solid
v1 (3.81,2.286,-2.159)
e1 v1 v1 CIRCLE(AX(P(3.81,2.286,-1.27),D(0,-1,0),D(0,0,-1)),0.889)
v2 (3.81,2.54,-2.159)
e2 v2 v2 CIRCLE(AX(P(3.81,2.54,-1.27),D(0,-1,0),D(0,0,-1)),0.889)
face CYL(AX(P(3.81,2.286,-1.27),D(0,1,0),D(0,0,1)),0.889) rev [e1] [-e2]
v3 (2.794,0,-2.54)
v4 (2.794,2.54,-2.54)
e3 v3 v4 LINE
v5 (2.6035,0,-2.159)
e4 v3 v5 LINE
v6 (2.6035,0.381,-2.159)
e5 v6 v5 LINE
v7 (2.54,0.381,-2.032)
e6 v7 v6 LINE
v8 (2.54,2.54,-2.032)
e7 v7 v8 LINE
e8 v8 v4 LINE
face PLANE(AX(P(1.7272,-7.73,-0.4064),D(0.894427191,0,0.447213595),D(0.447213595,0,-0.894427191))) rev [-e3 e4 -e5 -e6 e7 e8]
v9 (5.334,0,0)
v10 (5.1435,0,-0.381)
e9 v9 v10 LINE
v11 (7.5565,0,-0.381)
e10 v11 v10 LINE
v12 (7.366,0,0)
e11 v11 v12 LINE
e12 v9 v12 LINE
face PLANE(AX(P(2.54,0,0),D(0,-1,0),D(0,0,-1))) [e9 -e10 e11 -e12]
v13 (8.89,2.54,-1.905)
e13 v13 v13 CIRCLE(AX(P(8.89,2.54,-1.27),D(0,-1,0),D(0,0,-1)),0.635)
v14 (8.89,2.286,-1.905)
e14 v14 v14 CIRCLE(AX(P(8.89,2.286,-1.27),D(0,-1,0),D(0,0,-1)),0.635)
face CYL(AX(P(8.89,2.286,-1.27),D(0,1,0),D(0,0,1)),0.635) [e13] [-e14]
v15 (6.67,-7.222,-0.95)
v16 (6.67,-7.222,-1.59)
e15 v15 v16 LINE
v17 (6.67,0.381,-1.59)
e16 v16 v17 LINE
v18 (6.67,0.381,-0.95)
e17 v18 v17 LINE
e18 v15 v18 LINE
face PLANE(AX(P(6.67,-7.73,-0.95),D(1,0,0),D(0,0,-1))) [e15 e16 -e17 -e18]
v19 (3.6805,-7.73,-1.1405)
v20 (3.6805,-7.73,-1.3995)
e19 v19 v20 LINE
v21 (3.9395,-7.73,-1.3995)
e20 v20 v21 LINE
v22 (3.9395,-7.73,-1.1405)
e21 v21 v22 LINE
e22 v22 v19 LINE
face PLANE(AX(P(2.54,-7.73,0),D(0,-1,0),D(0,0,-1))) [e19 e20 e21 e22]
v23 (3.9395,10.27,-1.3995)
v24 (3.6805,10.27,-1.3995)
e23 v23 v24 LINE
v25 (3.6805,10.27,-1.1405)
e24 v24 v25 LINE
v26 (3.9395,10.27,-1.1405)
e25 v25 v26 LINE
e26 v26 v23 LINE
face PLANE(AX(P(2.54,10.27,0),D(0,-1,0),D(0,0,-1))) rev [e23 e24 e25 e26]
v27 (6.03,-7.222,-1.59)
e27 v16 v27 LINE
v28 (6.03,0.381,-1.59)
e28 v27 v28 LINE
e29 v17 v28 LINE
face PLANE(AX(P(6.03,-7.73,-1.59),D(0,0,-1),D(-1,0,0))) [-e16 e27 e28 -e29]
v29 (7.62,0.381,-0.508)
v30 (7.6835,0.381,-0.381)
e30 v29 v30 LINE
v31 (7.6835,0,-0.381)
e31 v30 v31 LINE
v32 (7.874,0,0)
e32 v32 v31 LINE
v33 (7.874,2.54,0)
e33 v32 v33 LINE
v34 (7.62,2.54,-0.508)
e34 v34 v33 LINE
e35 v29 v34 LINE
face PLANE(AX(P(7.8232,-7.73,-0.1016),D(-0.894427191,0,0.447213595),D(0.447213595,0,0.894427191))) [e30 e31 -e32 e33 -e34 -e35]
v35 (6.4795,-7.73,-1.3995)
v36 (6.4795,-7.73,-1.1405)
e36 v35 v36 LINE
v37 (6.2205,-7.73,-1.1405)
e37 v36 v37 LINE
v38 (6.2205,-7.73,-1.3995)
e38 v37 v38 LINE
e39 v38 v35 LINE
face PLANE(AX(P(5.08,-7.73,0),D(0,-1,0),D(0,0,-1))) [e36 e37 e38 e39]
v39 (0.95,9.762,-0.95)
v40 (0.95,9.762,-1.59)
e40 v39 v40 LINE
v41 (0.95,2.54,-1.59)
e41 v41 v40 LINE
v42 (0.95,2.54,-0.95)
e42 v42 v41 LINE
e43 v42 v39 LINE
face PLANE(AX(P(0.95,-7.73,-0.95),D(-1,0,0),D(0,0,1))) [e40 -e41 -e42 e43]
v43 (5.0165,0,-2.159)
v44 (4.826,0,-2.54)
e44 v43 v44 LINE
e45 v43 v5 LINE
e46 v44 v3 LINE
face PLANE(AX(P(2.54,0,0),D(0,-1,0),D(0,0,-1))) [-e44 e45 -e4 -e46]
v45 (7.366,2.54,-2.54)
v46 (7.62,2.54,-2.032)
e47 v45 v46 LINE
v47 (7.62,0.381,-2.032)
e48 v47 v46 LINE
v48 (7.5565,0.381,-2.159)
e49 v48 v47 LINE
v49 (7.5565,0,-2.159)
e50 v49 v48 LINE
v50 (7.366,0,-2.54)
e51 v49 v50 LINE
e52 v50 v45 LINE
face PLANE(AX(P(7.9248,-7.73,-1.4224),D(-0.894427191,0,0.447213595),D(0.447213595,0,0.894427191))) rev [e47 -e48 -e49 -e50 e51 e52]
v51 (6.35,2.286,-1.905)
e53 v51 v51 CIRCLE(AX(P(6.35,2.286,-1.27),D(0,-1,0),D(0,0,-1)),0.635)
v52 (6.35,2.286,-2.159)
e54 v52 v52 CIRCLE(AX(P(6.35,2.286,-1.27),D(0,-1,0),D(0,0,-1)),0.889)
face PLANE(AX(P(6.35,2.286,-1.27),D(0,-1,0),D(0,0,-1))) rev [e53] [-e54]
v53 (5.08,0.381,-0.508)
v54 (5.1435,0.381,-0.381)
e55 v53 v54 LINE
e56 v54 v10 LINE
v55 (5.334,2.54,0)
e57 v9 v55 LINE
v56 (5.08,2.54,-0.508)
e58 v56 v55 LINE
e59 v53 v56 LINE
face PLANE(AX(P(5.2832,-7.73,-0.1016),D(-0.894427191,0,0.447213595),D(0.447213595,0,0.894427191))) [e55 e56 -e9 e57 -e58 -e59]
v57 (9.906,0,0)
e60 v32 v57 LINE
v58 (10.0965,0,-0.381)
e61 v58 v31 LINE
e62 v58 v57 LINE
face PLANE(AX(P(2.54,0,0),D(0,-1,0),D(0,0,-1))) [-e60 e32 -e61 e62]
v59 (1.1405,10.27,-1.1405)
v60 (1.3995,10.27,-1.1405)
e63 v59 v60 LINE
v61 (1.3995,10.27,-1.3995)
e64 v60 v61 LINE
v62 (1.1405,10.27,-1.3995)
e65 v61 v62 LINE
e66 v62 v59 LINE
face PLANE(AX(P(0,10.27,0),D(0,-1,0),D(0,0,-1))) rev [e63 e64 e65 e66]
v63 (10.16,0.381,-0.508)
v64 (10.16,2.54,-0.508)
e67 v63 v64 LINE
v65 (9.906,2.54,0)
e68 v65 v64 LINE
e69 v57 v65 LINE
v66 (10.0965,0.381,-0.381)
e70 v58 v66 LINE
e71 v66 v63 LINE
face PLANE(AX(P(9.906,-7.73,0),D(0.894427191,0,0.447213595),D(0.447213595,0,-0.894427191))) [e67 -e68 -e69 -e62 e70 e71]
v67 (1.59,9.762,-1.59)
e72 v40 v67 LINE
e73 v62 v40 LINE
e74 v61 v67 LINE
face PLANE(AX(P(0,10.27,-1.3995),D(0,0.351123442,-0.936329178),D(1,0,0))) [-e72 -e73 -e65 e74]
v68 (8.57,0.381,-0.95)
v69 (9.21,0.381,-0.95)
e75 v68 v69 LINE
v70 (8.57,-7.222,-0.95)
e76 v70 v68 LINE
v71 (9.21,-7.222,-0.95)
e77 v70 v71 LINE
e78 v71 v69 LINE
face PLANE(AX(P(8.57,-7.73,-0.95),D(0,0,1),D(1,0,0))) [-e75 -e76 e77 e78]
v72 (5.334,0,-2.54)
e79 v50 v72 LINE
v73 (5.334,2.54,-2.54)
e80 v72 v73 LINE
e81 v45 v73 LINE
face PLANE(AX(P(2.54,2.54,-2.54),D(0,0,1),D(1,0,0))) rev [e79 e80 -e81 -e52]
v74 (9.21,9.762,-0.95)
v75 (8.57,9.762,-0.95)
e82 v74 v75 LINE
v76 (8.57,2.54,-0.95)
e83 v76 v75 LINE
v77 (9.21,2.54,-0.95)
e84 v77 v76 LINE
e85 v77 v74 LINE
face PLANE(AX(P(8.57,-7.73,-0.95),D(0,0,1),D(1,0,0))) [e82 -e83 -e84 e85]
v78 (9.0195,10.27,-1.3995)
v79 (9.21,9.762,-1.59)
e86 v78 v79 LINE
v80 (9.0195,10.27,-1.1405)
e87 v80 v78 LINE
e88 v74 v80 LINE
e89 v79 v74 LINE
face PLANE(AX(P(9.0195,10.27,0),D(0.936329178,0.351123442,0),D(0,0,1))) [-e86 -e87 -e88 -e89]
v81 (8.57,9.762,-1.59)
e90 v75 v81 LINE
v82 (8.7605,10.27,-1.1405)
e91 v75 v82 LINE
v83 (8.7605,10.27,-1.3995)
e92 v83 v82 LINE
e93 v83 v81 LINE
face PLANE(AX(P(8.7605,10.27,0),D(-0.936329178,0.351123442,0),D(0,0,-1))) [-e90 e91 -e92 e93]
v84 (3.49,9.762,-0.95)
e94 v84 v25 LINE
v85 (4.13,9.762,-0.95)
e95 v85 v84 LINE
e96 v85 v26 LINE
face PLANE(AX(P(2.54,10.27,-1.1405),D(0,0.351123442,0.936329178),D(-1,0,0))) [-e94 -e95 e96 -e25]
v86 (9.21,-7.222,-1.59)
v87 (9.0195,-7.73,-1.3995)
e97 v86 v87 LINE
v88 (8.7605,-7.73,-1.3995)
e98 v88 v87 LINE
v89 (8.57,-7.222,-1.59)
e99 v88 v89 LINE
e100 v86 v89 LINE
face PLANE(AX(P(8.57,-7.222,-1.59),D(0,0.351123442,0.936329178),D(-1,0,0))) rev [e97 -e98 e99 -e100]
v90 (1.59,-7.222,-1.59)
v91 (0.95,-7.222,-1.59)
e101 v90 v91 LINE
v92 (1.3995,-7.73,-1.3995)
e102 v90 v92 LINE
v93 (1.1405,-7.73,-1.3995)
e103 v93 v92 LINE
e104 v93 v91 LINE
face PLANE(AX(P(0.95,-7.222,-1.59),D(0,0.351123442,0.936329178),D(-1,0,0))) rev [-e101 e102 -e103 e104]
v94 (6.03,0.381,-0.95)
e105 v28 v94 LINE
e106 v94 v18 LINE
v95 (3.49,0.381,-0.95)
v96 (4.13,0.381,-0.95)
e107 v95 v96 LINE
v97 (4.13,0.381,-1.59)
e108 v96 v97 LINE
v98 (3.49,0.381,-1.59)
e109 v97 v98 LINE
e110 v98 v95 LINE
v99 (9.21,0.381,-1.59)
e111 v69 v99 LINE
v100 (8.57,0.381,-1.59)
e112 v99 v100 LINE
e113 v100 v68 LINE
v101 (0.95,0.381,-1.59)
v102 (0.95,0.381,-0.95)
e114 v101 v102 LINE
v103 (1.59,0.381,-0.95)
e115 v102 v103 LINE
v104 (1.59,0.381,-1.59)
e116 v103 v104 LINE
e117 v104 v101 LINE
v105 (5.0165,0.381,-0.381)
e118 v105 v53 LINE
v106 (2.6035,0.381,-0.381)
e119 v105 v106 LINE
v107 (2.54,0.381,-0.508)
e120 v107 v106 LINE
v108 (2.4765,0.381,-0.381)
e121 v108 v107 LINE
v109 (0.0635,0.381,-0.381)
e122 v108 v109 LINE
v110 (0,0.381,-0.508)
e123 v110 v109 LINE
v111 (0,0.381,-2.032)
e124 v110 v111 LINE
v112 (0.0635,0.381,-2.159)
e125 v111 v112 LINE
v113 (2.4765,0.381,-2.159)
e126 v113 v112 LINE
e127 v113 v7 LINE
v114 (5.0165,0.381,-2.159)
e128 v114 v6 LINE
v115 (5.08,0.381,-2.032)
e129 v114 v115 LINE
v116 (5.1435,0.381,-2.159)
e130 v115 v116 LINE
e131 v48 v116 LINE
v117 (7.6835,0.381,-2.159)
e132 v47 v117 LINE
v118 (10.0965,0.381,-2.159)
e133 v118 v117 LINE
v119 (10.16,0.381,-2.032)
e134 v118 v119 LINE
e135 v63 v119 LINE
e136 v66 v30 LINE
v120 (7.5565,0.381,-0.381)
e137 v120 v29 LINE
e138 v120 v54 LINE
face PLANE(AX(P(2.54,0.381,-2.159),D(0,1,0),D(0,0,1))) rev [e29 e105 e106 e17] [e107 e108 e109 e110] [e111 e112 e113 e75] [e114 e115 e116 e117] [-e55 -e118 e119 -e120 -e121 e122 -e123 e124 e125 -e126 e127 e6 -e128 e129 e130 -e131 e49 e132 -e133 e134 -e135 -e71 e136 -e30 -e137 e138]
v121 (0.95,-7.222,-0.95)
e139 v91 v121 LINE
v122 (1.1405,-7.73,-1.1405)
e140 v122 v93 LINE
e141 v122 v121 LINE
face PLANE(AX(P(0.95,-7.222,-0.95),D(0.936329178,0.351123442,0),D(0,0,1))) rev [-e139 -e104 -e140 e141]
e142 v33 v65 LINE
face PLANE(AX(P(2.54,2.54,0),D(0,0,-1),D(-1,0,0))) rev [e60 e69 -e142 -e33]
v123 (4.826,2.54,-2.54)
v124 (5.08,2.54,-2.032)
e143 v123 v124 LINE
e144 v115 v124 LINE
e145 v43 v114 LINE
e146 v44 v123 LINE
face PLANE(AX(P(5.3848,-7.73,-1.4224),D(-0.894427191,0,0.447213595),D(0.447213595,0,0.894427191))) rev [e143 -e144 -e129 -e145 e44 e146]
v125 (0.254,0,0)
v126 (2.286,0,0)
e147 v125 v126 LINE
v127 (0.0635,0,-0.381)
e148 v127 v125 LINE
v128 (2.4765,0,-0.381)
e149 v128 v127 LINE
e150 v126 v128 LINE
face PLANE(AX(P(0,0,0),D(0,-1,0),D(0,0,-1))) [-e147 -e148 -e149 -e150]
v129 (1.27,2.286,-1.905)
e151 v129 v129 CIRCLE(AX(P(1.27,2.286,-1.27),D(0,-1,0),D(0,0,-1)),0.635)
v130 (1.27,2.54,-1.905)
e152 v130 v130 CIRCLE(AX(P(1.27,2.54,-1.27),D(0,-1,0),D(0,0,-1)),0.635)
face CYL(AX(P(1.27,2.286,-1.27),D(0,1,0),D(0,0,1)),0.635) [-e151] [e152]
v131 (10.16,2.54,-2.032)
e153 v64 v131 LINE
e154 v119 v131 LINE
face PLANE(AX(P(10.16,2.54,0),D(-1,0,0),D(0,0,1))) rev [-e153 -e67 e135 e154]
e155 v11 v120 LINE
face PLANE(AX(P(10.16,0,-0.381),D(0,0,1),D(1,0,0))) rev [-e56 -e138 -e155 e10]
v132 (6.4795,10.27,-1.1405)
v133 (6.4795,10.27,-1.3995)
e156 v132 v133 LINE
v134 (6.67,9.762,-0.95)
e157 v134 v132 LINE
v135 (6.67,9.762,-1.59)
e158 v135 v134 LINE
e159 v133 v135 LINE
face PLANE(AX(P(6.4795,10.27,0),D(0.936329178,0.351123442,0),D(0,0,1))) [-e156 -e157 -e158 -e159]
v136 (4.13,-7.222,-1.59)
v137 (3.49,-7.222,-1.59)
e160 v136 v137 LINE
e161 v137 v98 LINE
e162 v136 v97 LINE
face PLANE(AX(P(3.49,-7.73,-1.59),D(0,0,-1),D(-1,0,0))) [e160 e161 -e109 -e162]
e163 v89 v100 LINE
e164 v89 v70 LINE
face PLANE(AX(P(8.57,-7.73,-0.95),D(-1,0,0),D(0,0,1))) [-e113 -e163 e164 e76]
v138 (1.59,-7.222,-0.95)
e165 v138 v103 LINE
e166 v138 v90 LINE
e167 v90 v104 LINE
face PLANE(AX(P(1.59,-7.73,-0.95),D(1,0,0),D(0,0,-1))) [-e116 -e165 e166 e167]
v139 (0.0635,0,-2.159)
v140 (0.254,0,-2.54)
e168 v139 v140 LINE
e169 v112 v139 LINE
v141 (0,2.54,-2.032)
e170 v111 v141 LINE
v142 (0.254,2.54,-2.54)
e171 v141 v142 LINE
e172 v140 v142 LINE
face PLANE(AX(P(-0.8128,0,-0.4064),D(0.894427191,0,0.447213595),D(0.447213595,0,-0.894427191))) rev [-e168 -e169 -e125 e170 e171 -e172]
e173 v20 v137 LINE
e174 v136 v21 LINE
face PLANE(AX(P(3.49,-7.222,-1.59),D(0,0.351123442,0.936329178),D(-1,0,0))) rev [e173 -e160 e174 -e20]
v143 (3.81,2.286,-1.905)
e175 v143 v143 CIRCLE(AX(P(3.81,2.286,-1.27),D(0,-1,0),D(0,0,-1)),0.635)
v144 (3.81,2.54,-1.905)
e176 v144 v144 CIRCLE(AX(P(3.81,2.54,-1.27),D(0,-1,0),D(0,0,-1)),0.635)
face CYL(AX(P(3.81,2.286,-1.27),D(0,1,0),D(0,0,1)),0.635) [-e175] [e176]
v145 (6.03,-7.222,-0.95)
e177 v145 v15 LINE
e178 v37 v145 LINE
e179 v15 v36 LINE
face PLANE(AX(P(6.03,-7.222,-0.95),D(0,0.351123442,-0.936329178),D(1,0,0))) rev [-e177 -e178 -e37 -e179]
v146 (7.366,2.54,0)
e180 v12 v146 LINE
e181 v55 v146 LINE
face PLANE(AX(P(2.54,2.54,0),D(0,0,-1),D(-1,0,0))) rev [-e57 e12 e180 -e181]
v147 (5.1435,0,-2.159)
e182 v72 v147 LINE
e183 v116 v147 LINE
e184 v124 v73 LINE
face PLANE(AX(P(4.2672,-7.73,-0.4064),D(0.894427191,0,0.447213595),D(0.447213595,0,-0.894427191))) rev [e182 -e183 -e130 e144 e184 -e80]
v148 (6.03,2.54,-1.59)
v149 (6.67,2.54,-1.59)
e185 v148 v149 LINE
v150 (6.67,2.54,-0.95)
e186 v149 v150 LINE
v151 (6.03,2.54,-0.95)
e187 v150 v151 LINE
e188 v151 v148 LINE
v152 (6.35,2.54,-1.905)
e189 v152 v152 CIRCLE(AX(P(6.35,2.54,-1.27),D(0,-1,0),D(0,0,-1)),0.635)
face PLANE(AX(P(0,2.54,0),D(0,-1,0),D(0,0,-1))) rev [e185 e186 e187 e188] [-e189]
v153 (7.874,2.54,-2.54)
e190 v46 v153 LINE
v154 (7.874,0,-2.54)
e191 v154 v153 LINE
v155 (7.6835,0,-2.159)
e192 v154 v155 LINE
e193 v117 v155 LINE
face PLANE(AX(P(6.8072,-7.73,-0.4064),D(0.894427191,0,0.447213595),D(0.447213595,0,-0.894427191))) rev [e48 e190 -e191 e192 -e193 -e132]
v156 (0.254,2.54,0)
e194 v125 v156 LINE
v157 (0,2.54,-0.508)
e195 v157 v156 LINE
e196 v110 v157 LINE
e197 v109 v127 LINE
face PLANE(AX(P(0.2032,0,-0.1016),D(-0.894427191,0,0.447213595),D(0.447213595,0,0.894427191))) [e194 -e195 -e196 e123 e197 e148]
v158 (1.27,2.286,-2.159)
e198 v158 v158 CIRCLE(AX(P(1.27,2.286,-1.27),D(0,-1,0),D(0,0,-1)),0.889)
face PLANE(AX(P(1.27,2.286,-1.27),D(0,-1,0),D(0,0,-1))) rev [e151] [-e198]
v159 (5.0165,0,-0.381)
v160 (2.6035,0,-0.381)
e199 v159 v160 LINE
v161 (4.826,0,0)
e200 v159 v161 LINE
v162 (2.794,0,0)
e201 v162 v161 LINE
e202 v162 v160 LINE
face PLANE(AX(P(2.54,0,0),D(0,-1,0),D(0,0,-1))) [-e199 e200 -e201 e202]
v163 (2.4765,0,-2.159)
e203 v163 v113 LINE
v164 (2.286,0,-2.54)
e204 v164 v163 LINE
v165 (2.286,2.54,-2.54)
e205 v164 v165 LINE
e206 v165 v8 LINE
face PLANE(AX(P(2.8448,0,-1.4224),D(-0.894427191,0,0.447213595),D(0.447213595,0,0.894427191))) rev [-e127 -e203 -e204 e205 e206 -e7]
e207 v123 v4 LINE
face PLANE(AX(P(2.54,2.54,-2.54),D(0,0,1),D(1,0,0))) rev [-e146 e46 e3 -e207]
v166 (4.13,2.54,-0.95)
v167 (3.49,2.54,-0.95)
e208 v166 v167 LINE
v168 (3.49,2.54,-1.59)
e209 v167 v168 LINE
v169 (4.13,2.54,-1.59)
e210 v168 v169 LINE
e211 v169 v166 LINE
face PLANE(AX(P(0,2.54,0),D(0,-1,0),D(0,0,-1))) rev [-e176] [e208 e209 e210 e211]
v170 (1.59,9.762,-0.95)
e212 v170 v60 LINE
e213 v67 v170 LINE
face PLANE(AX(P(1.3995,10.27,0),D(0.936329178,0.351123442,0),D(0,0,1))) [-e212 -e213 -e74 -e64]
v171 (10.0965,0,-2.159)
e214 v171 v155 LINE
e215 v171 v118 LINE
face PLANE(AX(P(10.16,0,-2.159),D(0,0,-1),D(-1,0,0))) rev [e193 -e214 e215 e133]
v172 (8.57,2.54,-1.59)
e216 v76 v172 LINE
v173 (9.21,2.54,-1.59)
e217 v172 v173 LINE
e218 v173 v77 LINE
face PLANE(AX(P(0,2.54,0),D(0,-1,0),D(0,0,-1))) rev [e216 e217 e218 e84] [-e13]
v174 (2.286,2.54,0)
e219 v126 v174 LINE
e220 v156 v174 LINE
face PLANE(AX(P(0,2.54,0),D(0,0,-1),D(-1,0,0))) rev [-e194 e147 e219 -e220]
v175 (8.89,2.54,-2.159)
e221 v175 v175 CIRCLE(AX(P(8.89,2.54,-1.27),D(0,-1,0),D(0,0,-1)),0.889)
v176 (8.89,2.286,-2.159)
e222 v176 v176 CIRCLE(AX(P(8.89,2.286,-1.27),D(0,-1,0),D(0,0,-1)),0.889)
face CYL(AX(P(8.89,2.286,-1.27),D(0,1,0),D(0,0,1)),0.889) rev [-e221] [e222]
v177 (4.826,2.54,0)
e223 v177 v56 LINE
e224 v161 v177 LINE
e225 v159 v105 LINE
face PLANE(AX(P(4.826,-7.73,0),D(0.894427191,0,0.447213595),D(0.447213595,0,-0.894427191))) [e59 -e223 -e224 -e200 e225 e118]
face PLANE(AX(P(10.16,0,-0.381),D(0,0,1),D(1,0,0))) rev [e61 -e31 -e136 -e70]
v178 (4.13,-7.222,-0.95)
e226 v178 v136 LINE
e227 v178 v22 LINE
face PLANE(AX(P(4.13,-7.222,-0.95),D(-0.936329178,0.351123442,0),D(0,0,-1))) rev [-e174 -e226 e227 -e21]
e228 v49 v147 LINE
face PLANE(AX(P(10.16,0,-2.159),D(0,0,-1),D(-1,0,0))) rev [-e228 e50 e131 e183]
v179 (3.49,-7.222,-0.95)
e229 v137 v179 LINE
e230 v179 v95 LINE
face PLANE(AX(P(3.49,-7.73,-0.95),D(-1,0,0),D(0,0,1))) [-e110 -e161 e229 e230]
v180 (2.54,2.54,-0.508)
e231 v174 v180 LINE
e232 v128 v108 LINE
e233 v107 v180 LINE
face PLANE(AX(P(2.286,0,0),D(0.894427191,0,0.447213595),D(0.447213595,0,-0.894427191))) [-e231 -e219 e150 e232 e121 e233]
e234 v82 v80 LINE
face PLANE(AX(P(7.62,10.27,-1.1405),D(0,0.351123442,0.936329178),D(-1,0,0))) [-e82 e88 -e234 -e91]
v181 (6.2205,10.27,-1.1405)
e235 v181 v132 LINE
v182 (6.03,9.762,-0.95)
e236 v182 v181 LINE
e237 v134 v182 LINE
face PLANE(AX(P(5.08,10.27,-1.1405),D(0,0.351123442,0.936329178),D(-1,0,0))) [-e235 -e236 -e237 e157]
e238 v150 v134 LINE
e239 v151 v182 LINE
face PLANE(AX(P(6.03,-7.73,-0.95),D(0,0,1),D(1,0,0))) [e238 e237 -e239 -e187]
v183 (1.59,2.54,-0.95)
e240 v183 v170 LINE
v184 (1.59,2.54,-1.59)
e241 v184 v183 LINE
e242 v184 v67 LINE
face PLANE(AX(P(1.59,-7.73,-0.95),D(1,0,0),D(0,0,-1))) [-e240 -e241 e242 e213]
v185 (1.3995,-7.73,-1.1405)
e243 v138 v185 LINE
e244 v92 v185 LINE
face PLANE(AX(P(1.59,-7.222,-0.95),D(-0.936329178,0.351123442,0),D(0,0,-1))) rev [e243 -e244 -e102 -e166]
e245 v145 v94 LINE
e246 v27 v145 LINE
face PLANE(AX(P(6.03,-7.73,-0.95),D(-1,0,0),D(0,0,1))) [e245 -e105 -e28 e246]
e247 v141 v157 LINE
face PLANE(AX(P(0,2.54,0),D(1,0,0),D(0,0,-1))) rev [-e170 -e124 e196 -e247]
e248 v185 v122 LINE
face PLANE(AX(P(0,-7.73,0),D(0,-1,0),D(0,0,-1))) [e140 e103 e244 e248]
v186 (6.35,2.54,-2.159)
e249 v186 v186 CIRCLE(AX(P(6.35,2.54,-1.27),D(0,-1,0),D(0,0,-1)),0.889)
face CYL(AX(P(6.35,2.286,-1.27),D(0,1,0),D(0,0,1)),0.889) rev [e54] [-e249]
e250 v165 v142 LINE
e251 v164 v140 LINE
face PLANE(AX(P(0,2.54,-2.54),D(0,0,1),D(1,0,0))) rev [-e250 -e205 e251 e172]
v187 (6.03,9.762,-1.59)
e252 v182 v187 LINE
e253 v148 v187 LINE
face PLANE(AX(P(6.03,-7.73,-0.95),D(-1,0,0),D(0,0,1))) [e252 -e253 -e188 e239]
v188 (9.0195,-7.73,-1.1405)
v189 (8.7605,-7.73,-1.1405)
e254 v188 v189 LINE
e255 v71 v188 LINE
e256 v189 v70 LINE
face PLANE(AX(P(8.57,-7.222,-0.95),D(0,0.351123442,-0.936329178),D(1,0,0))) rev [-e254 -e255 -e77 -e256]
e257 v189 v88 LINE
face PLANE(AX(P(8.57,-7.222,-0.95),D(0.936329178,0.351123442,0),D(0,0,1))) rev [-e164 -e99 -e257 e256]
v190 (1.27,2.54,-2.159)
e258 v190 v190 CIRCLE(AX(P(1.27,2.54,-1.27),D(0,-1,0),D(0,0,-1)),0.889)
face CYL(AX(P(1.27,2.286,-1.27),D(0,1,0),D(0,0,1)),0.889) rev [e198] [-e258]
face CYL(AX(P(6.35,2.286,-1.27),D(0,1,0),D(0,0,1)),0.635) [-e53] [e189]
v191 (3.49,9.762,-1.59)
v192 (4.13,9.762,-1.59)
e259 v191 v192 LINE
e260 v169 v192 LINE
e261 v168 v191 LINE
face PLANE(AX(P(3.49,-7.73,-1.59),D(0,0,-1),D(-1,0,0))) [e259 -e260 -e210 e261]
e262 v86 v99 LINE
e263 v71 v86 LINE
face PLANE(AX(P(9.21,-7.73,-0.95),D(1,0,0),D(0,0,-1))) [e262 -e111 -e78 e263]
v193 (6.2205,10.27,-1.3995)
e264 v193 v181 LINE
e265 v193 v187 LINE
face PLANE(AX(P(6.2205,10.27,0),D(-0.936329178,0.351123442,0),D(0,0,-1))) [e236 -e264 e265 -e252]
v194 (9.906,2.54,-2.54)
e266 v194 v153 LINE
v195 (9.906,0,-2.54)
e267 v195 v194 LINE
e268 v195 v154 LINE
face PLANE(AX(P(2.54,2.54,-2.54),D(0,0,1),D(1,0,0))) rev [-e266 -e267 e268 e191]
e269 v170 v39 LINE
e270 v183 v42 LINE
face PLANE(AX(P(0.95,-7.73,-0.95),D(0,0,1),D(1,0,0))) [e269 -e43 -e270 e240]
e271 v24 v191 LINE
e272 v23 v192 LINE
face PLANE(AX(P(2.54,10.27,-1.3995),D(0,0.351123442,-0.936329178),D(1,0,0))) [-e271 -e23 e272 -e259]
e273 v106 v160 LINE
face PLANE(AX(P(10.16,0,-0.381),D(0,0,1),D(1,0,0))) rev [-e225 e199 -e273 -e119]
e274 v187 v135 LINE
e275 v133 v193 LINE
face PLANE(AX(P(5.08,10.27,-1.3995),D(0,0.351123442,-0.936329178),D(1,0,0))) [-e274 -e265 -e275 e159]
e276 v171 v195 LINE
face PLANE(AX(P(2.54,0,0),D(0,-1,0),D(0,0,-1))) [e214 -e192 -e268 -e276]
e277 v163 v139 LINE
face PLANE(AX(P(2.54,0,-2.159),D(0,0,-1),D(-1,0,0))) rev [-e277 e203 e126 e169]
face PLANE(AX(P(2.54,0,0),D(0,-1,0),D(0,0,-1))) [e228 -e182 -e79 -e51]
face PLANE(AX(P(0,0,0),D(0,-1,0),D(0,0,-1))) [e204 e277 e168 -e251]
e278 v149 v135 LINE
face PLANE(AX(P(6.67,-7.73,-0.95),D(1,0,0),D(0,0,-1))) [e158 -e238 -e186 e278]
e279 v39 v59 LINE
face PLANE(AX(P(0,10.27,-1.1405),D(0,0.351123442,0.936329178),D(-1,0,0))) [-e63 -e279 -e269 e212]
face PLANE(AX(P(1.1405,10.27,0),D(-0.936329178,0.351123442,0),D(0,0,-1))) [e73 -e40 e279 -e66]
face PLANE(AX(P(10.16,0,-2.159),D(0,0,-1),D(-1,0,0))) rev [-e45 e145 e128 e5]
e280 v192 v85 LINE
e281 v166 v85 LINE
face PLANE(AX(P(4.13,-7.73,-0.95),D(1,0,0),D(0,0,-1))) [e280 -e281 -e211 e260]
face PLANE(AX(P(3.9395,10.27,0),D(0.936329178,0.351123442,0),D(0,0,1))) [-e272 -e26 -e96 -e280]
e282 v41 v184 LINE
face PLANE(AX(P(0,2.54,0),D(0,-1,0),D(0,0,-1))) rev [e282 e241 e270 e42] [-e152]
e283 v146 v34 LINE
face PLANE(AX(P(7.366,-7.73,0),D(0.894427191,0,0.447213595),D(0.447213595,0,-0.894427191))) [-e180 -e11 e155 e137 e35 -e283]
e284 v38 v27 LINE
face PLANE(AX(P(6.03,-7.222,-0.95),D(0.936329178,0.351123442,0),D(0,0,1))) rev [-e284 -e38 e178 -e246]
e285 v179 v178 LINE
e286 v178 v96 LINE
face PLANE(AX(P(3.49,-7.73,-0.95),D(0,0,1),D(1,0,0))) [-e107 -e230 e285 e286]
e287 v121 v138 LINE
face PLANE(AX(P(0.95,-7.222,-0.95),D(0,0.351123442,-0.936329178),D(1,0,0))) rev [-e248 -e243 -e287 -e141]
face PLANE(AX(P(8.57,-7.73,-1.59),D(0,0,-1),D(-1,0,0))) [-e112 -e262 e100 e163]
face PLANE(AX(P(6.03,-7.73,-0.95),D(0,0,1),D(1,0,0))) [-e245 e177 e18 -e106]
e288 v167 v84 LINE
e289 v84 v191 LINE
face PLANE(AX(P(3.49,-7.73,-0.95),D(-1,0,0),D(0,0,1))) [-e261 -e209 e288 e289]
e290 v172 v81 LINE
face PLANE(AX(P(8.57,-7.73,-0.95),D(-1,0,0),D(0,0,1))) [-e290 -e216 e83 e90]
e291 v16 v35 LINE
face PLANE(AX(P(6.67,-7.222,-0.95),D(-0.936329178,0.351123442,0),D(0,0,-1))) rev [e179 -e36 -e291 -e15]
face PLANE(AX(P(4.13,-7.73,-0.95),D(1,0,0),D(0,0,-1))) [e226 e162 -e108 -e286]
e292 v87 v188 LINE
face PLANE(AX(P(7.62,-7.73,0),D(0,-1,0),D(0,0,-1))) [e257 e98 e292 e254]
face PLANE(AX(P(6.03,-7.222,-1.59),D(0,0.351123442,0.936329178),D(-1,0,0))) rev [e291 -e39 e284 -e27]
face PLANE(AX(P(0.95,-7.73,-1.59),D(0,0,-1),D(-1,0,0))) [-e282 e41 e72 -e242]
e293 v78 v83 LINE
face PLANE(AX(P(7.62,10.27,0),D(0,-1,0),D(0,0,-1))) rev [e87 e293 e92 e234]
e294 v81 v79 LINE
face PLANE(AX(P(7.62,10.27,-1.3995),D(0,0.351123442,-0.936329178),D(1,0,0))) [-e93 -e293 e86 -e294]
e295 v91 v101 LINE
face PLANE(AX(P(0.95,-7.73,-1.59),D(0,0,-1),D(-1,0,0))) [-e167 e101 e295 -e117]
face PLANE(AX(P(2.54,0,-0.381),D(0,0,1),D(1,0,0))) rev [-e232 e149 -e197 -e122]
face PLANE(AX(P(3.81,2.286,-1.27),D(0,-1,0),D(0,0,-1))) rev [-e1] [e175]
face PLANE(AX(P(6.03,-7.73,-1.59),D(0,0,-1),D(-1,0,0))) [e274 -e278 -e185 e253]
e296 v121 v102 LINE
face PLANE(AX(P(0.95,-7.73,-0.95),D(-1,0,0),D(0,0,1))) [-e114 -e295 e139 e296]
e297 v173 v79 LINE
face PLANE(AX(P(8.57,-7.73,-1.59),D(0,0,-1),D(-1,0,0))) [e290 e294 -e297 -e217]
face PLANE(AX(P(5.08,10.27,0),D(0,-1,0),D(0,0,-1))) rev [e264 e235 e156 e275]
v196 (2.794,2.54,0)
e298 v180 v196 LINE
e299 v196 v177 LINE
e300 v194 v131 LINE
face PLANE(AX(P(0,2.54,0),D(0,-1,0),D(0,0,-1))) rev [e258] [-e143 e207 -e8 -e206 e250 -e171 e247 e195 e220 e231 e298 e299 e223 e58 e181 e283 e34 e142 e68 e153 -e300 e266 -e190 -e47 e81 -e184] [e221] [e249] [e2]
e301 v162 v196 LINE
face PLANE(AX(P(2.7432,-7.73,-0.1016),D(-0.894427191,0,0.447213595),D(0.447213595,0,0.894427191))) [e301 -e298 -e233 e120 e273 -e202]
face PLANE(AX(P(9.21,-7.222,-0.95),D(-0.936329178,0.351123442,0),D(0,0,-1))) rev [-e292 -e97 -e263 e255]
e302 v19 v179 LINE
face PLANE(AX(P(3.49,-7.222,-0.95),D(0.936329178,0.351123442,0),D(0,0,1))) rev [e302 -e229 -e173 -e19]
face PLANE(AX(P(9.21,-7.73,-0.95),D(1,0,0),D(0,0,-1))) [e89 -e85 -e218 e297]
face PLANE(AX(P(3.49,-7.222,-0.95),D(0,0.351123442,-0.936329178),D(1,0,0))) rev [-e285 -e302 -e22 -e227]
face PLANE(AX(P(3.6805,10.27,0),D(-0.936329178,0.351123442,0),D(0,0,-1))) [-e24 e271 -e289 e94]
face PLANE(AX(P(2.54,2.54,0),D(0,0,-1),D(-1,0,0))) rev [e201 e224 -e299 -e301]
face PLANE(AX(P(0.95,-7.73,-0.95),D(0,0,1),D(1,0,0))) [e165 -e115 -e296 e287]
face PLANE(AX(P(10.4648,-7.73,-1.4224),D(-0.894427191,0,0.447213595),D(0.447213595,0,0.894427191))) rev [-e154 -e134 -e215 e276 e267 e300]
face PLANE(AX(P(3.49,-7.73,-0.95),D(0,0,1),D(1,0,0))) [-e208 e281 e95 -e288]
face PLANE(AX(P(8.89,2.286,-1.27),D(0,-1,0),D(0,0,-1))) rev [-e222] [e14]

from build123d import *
from OCP.BRepFilletAPI import BRepFilletAPI_MakeChamfer

# Parameters (mm, degrees)
SKETCH1_W                          = 2.54
SKETCH1_H                          = 2.54
MAIN_BODY_DEPTH                    = 2.54
SKETCH3_W                          = 1.778
SKETCH3_H                          = 0.381
CUT_EXTRUDE1_DEPTH                 = 5.399409051
CUT_EXTRUDE2_DEPTH                 = 5.399409051
PIN_START                          = -10.27
SKETCH2_W                          = 0.64
SKETCH2_H                          = 0.64
PIN_DEPTH                          = 18
CHAMFER1_SIZE                      = 0.508
CHAMFER1_SIZE2                     = 0.1905
CHAMFER2_SIZE                      = 0.1905
CHAMFER2_SIZE2                     = 0.508
ESQUISSE1_R                        = 0.889
ESQUISSE1_R_2                      = 0.635
ENL_V_MAT_EXTRU_1_DEPTH            = 0.254
R_P_TITION_START                   = 0.381
R_P_TITION_LIN_AIRE3_DEPTH         = 1.905
R_P_TITION_START_2                 = -7.222
R_P_TITION_LIN_AIRE3_2_OUTLINE_W   = 0.64
R_P_TITION_LIN_AIRE3_2_OUTLINE_H   = 0.64
R_P_TITION_LIN_AIRE3_2_DEPTH       = 16.984
R_P_TITION_START_3                 = 2.286
R_P_TITION_LIN_AIRE3_3_OUTLINE_R   = 0.889
R_P_TITION_LIN_AIRE3_3_OUTLINE_R_2 = 0.635
R_P_TITION_LIN_AIRE3_3_OUTLINE_W   = 0.64
R_P_TITION_LIN_AIRE3_3_OUTLINE_H   = 0.64
R_P_TITION_LIN_AIRE3_3_DEPTH       = 0.254
R_P_TITION_LIN_AIRE3_4_DEPTH       = 0.381


with BuildPart() as part:
    # Sketch1 → Main Body (new body)
    with BuildSketch(Plane(origin=(0, 0, 0), x_dir=(1, 0, 0), z_dir=(0, 1, 0))):
        with Locations((1.27, 1.27)):
            Rectangle(SKETCH1_W, SKETCH1_H)
    extrude(amount=MAIN_BODY_DEPTH)

    # Sketch3 → Cut-Extrude1 (cut, through all)
    with BuildSketch(Plane.ZY):
        with Locations((-1.27, 0.1905)):
            Rectangle(SKETCH3_W, SKETCH3_H)
    extrude(amount=-CUT_EXTRUDE1_DEPTH, mode=Mode.SUBTRACT)

    # Sketch4 → Cut-Extrude2 (cut, through all)
    with BuildSketch(Plane(origin=(0, 2.54, 0), x_dir=(1, 0, 0), z_dir=(0, 1, 0))):
        Polygon((0.254, 2.54), (0, 2.54), (0, 2.032), align=None)
        Polygon((2.54, 2.54), (2.286, 2.54), (2.54, 2.032), align=None)
        Polygon((0.254, 0), (0, 0.508), (0, 0), align=None)
        Polygon((2.54, 0), (2.286, 0), (2.54, 0.508), align=None)
    extrude(amount=-CUT_EXTRUDE2_DEPTH, mode=Mode.SUBTRACT)

    # Sketch2 → Pin (add)
    with BuildSketch(Plane(origin=(0, 2.54, 0), x_dir=(1, 0, 0), z_dir=(0, 1, 0)).offset(PIN_START)):
        with Locations((1.27, 1.27)):
            Rectangle(SKETCH2_W, SKETCH2_H)
    extrude(amount=PIN_DEPTH)

    # Chamfer1: one chamfer whose edges measure the first distance from different faces: ONE call of the kernel's chamfer builder (chamfer() names one face for all edges)
    chamfer1_edges_1 = [part.edges().sort_by_distance(p)[0] for p in [
        (0.95, 10.27, -1.27),
    ]]
    chamfer1_side_1 = [part.faces().sort_by_distance(p)[0] for p in [
        (0.95, 6.405, -1.27),
    ]]
    chamfer1_edges_2 = [part.edges().sort_by_distance(p)[0] for p in [
        (1.27, 10.27, -0.95),
    ]]
    chamfer1_side_2 = [part.faces().sort_by_distance(p)[0] for p in [
        (1.27, 6.405, -0.95),
    ]]
    chamfer1_edges_3 = [part.edges().sort_by_distance(p)[0] for p in [
        (1.59, 10.27, -1.27),
    ]]
    chamfer1_side_3 = [part.faces().sort_by_distance(p)[0] for p in [
        (1.59, 6.405, -1.27),
    ]]
    chamfer1_edges_4 = [part.edges().sort_by_distance(p)[0] for p in [
        (1.27, 10.27, -1.59),
    ]]
    chamfer1_side_4 = [part.faces().sort_by_distance(p)[0] for p in [
        (1.27, 6.405, -1.59),
    ]]
    chamfer1 = BRepFilletAPI_MakeChamfer(part.part.solid().wrapped)
    for e in chamfer1_edges_1:
        chamfer1.Add(CHAMFER1_SIZE, CHAMFER1_SIZE2, e.wrapped, chamfer1_side_1[0].wrapped)  # the first distance lies on this face
    for e in chamfer1_edges_2:
        chamfer1.Add(CHAMFER1_SIZE, CHAMFER1_SIZE2, e.wrapped, chamfer1_side_2[0].wrapped)  # the first distance lies on this face
    for e in chamfer1_edges_3:
        chamfer1.Add(CHAMFER1_SIZE, CHAMFER1_SIZE2, e.wrapped, chamfer1_side_3[0].wrapped)  # the first distance lies on this face
    for e in chamfer1_edges_4:
        chamfer1.Add(CHAMFER1_SIZE, CHAMFER1_SIZE2, e.wrapped, chamfer1_side_4[0].wrapped)  # the first distance lies on this face
    add(Compound.cast(chamfer1.Shape()), mode=Mode.REPLACE)

    # Chamfer2
    chamfer2_edges = [part.edges().sort_by_distance(p)[0] for p in [
        (1.59, -7.73, -1.27),
        (1.27, -7.73, -0.95),
        (0.95, -7.73, -1.27),
        (1.27, -7.73, -1.59),
    ]]
    chamfer2_side = [part.faces().sort_by_distance(p)[0] for p in [
        (1.27, -7.73, -1.27),
    ]]
    chamfer(chamfer2_edges, length=CHAMFER2_SIZE, length2=CHAMFER2_SIZE2, reference=chamfer2_side[0])

    # Esquisse1 → Enlèv. mat.-Extru.1 (cut)
    with BuildSketch(Plane.XZ.offset(-2.54)):
        with Locations(Location((1.27, -1.27, 0), (0, 0, 270))):
            Circle(ESQUISSE1_R)
        with Locations(Location((1.27, -1.27, 0), (0, 0, 270))):
            Circle(ESQUISSE1_R_2, mode=Mode.SUBTRACT)
    extrude(amount=ENL_V_MAT_EXTRU_1_DEPTH, mode=Mode.SUBTRACT)

    # Répétition linéaire3: read off the stored shape, not the designer's step
    # Répétition linéaire3 outline → Répétition linéaire3 (add)
    with BuildSketch(Plane(origin=(0, 0, 0), x_dir=(1, 0, 0), z_dir=(0, 1, 0)).offset(R_P_TITION_START)):
        Polygon((5.334, 0), (7.366, 0), (7.62, 0.508), (7.874, 0), (9.906, 0), (10.16, 0.508), (10.16, 2.032), (9.906, 2.54), (7.874, 2.54), (7.62, 2.032), (7.366, 2.54), (5.334, 2.54), (5.08, 2.032), (4.826, 2.54), (2.794, 2.54), (2.54, 2.032), (2.54, 0.508), (2.794, 0), (4.826, 0), (5.08, 0.508), align=None)
    extrude(amount=R_P_TITION_LIN_AIRE3_DEPTH)

    # R_p_tition lin_aire3 2 outline → R_p_tition lin_aire3 2 (add)
    with BuildSketch(Plane(origin=(0, 0, 0), x_dir=(1, 0, 0), z_dir=(0, 1, 0)).offset(R_P_TITION_START_2)):
        with Locations((3.81, 1.27)):
            Rectangle(R_P_TITION_LIN_AIRE3_2_OUTLINE_W, R_P_TITION_LIN_AIRE3_2_OUTLINE_H)
        with Locations((6.35, 1.27)):
            Rectangle(R_P_TITION_LIN_AIRE3_2_OUTLINE_W, R_P_TITION_LIN_AIRE3_2_OUTLINE_H)
        with Locations((8.89, 1.27)):
            Rectangle(R_P_TITION_LIN_AIRE3_2_OUTLINE_W, R_P_TITION_LIN_AIRE3_2_OUTLINE_H)
    extrude(amount=R_P_TITION_LIN_AIRE3_2_DEPTH)

    # R_p_tition lin_aire3 3 outline → R_p_tition lin_aire3 3 (add)
    # profile 1 of 4: a face of its own
    with BuildSketch(Plane(origin=(0, 0, 0), x_dir=(1, 0, 0), z_dir=(0, 1, 0)).offset(R_P_TITION_START_3)):
        Polygon((5.334, 0), (7.366, 0), (7.62, 0.508), (7.874, 0), (9.906, 0), (10.16, 0.508), (10.16, 2.032), (9.906, 2.54), (7.874, 2.54), (7.62, 2.032), (7.366, 2.54), (5.334, 2.54), (5.08, 2.032), (4.826, 2.54), (2.794, 2.54), (2.54, 2.032), (2.54, 0.508), (2.794, 0), (4.826, 0), (5.08, 0.508), align=None)
        with Locations((3.81, 1.27)):
            Circle(R_P_TITION_LIN_AIRE3_3_OUTLINE_R, mode=Mode.SUBTRACT)
        with Locations((6.35, 1.27)):
            Circle(R_P_TITION_LIN_AIRE3_3_OUTLINE_R, mode=Mode.SUBTRACT)
        with Locations((8.89, 1.27)):
            Circle(R_P_TITION_LIN_AIRE3_3_OUTLINE_R, mode=Mode.SUBTRACT)
    # profile 2 of 4: a face of its own
    with BuildSketch(Plane(origin=(0, 0, 0), x_dir=(1, 0, 0), z_dir=(0, 1, 0)).offset(R_P_TITION_START_3)):
        with Locations((8.89, 1.27)):
            Circle(R_P_TITION_LIN_AIRE3_3_OUTLINE_R_2)
        with Locations((8.89, 1.27)):
            Rectangle(R_P_TITION_LIN_AIRE3_3_OUTLINE_W, R_P_TITION_LIN_AIRE3_3_OUTLINE_H, mode=Mode.SUBTRACT)
    # profile 3 of 4: a face of its own
    with BuildSketch(Plane(origin=(0, 0, 0), x_dir=(1, 0, 0), z_dir=(0, 1, 0)).offset(R_P_TITION_START_3)):
        with Locations((6.35, 1.27)):
            Circle(R_P_TITION_LIN_AIRE3_3_OUTLINE_R_2)
        with Locations((6.35, 1.27)):
            Rectangle(R_P_TITION_LIN_AIRE3_3_OUTLINE_W, R_P_TITION_LIN_AIRE3_3_OUTLINE_H, mode=Mode.SUBTRACT)
    # profile 4 of 4: a face of its own
    with BuildSketch(Plane(origin=(0, 0, 0), x_dir=(1, 0, 0), z_dir=(0, 1, 0)).offset(R_P_TITION_START_3)):
        with Locations((3.81, 1.27)):
            Circle(R_P_TITION_LIN_AIRE3_3_OUTLINE_R_2)
        with Locations((3.81, 1.27)):
            Rectangle(R_P_TITION_LIN_AIRE3_3_OUTLINE_W, R_P_TITION_LIN_AIRE3_3_OUTLINE_H, mode=Mode.SUBTRACT)
    extrude(amount=R_P_TITION_LIN_AIRE3_3_DEPTH)

    # R_p_tition lin_aire3 4 outline → R_p_tition lin_aire3 4 (add)
    with BuildSketch(Plane(origin=(0, 0, 0), x_dir=(1, 0, 0), z_dir=(0, 1, 0))):
        Polygon((5.334, 0), (7.366, 0), (7.5565, 0.381), (5.1435, 0.381), align=None)
        Polygon((5.1435, 2.159), (7.5565, 2.159), (7.366, 2.54), (5.334, 2.54), align=None)
        Polygon((10.0965, 0.381), (7.6835, 0.381), (7.874, 0), (9.906, 0), align=None)
        Polygon((4.826, 0), (5.0165, 0.381), (2.6035, 0.381), (2.794, 0), align=None)
        Polygon((7.6835, 2.159), (10.0965, 2.159), (9.906, 2.54), (7.874, 2.54), align=None)
        Polygon((2.6035, 2.159), (5.0165, 2.159), (4.826, 2.54), (2.794, 2.54), align=None)
    extrude(amount=R_P_TITION_LIN_AIRE3_4_DEPTH)

    # R_p_tition lin_aire3 5: loft between two sections, ruled curve by curve
    r_p_tition_lin_aire3_5_from = [
        Edge.make_line((3.49, -7.222, -0.95), (4.13, -7.222, -0.95)),
        Edge.make_line((4.13, -7.222, -1.59), (3.49, -7.222, -1.59)),
        Edge.make_line((4.13, -7.222, -0.95), (4.13, -7.222, -1.59)),
        Edge.make_line((3.49, -7.222, -0.95), (3.49, -7.222, -1.59)),
    ]
    r_p_tition_lin_aire3_5_to = [
        Edge.make_line((3.6805, -7.73, -1.1405), (3.9395, -7.73, -1.1405)),
        Edge.make_line((3.9395, -7.73, -1.3995), (3.6805, -7.73, -1.3995)),
        Edge.make_line((3.9395, -7.73, -1.1405), (3.9395, -7.73, -1.3995)),
        Edge.make_line((3.6805, -7.73, -1.1405), (3.6805, -7.73, -1.3995)),
    ]
    r_p_tition_lin_aire3_5 = Solid(Shell([*[Face.make_surface_from_curves(r_p_tition_lin_aire3_5_from[k], r_p_tition_lin_aire3_5_to[k]) for k in range(4)], Face(Wire(r_p_tition_lin_aire3_5_from)), Face(Wire(r_p_tition_lin_aire3_5_to))]))
    add(r_p_tition_lin_aire3_5)

    # R_p_tition lin_aire3 6: loft between two sections, ruled curve by curve
    r_p_tition_lin_aire3_6_from = [
        Edge.make_line((6.03, -7.222, -0.95), (6.67, -7.222, -0.95)),
        Edge.make_line((6.67, -7.222, -1.59), (6.03, -7.222, -1.59)),
        Edge.make_line((6.67, -7.222, -0.95), (6.67, -7.222, -1.59)),
        Edge.make_line((6.03, -7.222, -0.95), (6.03, -7.222, -1.59)),
    ]
    r_p_tition_lin_aire3_6_to = [
        Edge.make_line((6.2205, -7.73, -1.1405), (6.4795, -7.73, -1.1405)),
        Edge.make_line((6.4795, -7.73, -1.3995), (6.2205, -7.73, -1.3995)),
        Edge.make_line((6.4795, -7.73, -1.1405), (6.4795, -7.73, -1.3995)),
        Edge.make_line((6.2205, -7.73, -1.1405), (6.2205, -7.73, -1.3995)),
    ]
    r_p_tition_lin_aire3_6 = Solid(Shell([*[Face.make_surface_from_curves(r_p_tition_lin_aire3_6_from[k], r_p_tition_lin_aire3_6_to[k]) for k in range(4)], Face(Wire(r_p_tition_lin_aire3_6_from)), Face(Wire(r_p_tition_lin_aire3_6_to))]))
    add(r_p_tition_lin_aire3_6)

    # R_p_tition lin_aire3 7: loft between two sections, ruled curve by curve
    r_p_tition_lin_aire3_7_from = [
        Edge.make_line((8.57, -7.222, -0.95), (9.21, -7.222, -0.95)),
        Edge.make_line((9.21, -7.222, -1.59), (8.57, -7.222, -1.59)),
        Edge.make_line((9.21, -7.222, -0.95), (9.21, -7.222, -1.59)),
        Edge.make_line((8.57, -7.222, -0.95), (8.57, -7.222, -1.59)),
    ]
    r_p_tition_lin_aire3_7_to = [
        Edge.make_line((8.7605, -7.73, -1.1405), (9.0195, -7.73, -1.1405)),
        Edge.make_line((9.0195, -7.73, -1.3995), (8.7605, -7.73, -1.3995)),
        Edge.make_line((9.0195, -7.73, -1.1405), (9.0195, -7.73, -1.3995)),
        Edge.make_line((8.7605, -7.73, -1.1405), (8.7605, -7.73, -1.3995)),
    ]
    r_p_tition_lin_aire3_7 = Solid(Shell([*[Face.make_surface_from_curves(r_p_tition_lin_aire3_7_from[k], r_p_tition_lin_aire3_7_to[k]) for k in range(4)], Face(Wire(r_p_tition_lin_aire3_7_from)), Face(Wire(r_p_tition_lin_aire3_7_to))]))
    add(r_p_tition_lin_aire3_7)

    # R_p_tition lin_aire3 8: loft between two sections, ruled curve by curve
    r_p_tition_lin_aire3_8_from = [
        Edge.make_line((9.0195, 10.27, -1.3995), (8.7605, 10.27, -1.3995)),
        Edge.make_line((9.0195, 10.27, -1.1405), (8.7605, 10.27, -1.1405)),
        Edge.make_line((9.0195, 10.27, -1.1405), (9.0195, 10.27, -1.3995)),
        Edge.make_line((8.7605, 10.27, -1.3995), (8.7605, 10.27, -1.1405)),
    ]
    r_p_tition_lin_aire3_8_to = [
        Edge.make_line((9.21, 9.762, -1.59), (8.57, 9.762, -1.59)),
        Edge.make_line((9.21, 9.762, -0.95), (8.57, 9.762, -0.95)),
        Edge.make_line((9.21, 9.762, -0.95), (9.21, 9.762, -1.59)),
        Edge.make_line((8.57, 9.762, -1.59), (8.57, 9.762, -0.95)),
    ]
    r_p_tition_lin_aire3_8 = Solid(Shell([*[Face.make_surface_from_curves(r_p_tition_lin_aire3_8_from[k], r_p_tition_lin_aire3_8_to[k]) for k in range(4)], Face(Wire(r_p_tition_lin_aire3_8_from)), Face(Wire(r_p_tition_lin_aire3_8_to))]))
    add(r_p_tition_lin_aire3_8)

    # R_p_tition lin_aire3 9: loft between two sections, ruled curve by curve
    r_p_tition_lin_aire3_9_from = [
        Edge.make_line((6.4795, 10.27, -1.3995), (6.2205, 10.27, -1.3995)),
        Edge.make_line((6.4795, 10.27, -1.1405), (6.2205, 10.27, -1.1405)),
        Edge.make_line((6.4795, 10.27, -1.1405), (6.4795, 10.27, -1.3995)),
        Edge.make_line((6.2205, 10.27, -1.3995), (6.2205, 10.27, -1.1405)),
    ]
    r_p_tition_lin_aire3_9_to = [
        Edge.make_line((6.67, 9.762, -1.59), (6.03, 9.762, -1.59)),
        Edge.make_line((6.67, 9.762, -0.95), (6.03, 9.762, -0.95)),
        Edge.make_line((6.67, 9.762, -0.95), (6.67, 9.762, -1.59)),
        Edge.make_line((6.03, 9.762, -1.59), (6.03, 9.762, -0.95)),
    ]
    r_p_tition_lin_aire3_9 = Solid(Shell([*[Face.make_surface_from_curves(r_p_tition_lin_aire3_9_from[k], r_p_tition_lin_aire3_9_to[k]) for k in range(4)], Face(Wire(r_p_tition_lin_aire3_9_from)), Face(Wire(r_p_tition_lin_aire3_9_to))]))
    add(r_p_tition_lin_aire3_9)

    # R_p_tition lin_aire3 10: loft between two sections, ruled curve by curve
    r_p_tition_lin_aire3_10_from = [
        Edge.make_line((3.9395, 10.27, -1.3995), (3.6805, 10.27, -1.3995)),
        Edge.make_line((3.9395, 10.27, -1.1405), (3.6805, 10.27, -1.1405)),
        Edge.make_line((3.9395, 10.27, -1.1405), (3.9395, 10.27, -1.3995)),
        Edge.make_line((3.6805, 10.27, -1.3995), (3.6805, 10.27, -1.1405)),
    ]
    r_p_tition_lin_aire3_10_to = [
        Edge.make_line((4.13, 9.762, -1.59), (3.49, 9.762, -1.59)),
        Edge.make_line((4.13, 9.762, -0.95), (3.49, 9.762, -0.95)),
        Edge.make_line((4.13, 9.762, -0.95), (4.13, 9.762, -1.59)),
        Edge.make_line((3.49, 9.762, -1.59), (3.49, 9.762, -0.95)),
    ]
    r_p_tition_lin_aire3_10 = Solid(Shell([*[Face.make_surface_from_curves(r_p_tition_lin_aire3_10_from[k], r_p_tition_lin_aire3_10_to[k]) for k in range(4)], Face(Wire(r_p_tition_lin_aire3_10_from)), Face(Wire(r_p_tition_lin_aire3_10_to))]))
    add(r_p_tition_lin_aire3_10)


solid = part.part
